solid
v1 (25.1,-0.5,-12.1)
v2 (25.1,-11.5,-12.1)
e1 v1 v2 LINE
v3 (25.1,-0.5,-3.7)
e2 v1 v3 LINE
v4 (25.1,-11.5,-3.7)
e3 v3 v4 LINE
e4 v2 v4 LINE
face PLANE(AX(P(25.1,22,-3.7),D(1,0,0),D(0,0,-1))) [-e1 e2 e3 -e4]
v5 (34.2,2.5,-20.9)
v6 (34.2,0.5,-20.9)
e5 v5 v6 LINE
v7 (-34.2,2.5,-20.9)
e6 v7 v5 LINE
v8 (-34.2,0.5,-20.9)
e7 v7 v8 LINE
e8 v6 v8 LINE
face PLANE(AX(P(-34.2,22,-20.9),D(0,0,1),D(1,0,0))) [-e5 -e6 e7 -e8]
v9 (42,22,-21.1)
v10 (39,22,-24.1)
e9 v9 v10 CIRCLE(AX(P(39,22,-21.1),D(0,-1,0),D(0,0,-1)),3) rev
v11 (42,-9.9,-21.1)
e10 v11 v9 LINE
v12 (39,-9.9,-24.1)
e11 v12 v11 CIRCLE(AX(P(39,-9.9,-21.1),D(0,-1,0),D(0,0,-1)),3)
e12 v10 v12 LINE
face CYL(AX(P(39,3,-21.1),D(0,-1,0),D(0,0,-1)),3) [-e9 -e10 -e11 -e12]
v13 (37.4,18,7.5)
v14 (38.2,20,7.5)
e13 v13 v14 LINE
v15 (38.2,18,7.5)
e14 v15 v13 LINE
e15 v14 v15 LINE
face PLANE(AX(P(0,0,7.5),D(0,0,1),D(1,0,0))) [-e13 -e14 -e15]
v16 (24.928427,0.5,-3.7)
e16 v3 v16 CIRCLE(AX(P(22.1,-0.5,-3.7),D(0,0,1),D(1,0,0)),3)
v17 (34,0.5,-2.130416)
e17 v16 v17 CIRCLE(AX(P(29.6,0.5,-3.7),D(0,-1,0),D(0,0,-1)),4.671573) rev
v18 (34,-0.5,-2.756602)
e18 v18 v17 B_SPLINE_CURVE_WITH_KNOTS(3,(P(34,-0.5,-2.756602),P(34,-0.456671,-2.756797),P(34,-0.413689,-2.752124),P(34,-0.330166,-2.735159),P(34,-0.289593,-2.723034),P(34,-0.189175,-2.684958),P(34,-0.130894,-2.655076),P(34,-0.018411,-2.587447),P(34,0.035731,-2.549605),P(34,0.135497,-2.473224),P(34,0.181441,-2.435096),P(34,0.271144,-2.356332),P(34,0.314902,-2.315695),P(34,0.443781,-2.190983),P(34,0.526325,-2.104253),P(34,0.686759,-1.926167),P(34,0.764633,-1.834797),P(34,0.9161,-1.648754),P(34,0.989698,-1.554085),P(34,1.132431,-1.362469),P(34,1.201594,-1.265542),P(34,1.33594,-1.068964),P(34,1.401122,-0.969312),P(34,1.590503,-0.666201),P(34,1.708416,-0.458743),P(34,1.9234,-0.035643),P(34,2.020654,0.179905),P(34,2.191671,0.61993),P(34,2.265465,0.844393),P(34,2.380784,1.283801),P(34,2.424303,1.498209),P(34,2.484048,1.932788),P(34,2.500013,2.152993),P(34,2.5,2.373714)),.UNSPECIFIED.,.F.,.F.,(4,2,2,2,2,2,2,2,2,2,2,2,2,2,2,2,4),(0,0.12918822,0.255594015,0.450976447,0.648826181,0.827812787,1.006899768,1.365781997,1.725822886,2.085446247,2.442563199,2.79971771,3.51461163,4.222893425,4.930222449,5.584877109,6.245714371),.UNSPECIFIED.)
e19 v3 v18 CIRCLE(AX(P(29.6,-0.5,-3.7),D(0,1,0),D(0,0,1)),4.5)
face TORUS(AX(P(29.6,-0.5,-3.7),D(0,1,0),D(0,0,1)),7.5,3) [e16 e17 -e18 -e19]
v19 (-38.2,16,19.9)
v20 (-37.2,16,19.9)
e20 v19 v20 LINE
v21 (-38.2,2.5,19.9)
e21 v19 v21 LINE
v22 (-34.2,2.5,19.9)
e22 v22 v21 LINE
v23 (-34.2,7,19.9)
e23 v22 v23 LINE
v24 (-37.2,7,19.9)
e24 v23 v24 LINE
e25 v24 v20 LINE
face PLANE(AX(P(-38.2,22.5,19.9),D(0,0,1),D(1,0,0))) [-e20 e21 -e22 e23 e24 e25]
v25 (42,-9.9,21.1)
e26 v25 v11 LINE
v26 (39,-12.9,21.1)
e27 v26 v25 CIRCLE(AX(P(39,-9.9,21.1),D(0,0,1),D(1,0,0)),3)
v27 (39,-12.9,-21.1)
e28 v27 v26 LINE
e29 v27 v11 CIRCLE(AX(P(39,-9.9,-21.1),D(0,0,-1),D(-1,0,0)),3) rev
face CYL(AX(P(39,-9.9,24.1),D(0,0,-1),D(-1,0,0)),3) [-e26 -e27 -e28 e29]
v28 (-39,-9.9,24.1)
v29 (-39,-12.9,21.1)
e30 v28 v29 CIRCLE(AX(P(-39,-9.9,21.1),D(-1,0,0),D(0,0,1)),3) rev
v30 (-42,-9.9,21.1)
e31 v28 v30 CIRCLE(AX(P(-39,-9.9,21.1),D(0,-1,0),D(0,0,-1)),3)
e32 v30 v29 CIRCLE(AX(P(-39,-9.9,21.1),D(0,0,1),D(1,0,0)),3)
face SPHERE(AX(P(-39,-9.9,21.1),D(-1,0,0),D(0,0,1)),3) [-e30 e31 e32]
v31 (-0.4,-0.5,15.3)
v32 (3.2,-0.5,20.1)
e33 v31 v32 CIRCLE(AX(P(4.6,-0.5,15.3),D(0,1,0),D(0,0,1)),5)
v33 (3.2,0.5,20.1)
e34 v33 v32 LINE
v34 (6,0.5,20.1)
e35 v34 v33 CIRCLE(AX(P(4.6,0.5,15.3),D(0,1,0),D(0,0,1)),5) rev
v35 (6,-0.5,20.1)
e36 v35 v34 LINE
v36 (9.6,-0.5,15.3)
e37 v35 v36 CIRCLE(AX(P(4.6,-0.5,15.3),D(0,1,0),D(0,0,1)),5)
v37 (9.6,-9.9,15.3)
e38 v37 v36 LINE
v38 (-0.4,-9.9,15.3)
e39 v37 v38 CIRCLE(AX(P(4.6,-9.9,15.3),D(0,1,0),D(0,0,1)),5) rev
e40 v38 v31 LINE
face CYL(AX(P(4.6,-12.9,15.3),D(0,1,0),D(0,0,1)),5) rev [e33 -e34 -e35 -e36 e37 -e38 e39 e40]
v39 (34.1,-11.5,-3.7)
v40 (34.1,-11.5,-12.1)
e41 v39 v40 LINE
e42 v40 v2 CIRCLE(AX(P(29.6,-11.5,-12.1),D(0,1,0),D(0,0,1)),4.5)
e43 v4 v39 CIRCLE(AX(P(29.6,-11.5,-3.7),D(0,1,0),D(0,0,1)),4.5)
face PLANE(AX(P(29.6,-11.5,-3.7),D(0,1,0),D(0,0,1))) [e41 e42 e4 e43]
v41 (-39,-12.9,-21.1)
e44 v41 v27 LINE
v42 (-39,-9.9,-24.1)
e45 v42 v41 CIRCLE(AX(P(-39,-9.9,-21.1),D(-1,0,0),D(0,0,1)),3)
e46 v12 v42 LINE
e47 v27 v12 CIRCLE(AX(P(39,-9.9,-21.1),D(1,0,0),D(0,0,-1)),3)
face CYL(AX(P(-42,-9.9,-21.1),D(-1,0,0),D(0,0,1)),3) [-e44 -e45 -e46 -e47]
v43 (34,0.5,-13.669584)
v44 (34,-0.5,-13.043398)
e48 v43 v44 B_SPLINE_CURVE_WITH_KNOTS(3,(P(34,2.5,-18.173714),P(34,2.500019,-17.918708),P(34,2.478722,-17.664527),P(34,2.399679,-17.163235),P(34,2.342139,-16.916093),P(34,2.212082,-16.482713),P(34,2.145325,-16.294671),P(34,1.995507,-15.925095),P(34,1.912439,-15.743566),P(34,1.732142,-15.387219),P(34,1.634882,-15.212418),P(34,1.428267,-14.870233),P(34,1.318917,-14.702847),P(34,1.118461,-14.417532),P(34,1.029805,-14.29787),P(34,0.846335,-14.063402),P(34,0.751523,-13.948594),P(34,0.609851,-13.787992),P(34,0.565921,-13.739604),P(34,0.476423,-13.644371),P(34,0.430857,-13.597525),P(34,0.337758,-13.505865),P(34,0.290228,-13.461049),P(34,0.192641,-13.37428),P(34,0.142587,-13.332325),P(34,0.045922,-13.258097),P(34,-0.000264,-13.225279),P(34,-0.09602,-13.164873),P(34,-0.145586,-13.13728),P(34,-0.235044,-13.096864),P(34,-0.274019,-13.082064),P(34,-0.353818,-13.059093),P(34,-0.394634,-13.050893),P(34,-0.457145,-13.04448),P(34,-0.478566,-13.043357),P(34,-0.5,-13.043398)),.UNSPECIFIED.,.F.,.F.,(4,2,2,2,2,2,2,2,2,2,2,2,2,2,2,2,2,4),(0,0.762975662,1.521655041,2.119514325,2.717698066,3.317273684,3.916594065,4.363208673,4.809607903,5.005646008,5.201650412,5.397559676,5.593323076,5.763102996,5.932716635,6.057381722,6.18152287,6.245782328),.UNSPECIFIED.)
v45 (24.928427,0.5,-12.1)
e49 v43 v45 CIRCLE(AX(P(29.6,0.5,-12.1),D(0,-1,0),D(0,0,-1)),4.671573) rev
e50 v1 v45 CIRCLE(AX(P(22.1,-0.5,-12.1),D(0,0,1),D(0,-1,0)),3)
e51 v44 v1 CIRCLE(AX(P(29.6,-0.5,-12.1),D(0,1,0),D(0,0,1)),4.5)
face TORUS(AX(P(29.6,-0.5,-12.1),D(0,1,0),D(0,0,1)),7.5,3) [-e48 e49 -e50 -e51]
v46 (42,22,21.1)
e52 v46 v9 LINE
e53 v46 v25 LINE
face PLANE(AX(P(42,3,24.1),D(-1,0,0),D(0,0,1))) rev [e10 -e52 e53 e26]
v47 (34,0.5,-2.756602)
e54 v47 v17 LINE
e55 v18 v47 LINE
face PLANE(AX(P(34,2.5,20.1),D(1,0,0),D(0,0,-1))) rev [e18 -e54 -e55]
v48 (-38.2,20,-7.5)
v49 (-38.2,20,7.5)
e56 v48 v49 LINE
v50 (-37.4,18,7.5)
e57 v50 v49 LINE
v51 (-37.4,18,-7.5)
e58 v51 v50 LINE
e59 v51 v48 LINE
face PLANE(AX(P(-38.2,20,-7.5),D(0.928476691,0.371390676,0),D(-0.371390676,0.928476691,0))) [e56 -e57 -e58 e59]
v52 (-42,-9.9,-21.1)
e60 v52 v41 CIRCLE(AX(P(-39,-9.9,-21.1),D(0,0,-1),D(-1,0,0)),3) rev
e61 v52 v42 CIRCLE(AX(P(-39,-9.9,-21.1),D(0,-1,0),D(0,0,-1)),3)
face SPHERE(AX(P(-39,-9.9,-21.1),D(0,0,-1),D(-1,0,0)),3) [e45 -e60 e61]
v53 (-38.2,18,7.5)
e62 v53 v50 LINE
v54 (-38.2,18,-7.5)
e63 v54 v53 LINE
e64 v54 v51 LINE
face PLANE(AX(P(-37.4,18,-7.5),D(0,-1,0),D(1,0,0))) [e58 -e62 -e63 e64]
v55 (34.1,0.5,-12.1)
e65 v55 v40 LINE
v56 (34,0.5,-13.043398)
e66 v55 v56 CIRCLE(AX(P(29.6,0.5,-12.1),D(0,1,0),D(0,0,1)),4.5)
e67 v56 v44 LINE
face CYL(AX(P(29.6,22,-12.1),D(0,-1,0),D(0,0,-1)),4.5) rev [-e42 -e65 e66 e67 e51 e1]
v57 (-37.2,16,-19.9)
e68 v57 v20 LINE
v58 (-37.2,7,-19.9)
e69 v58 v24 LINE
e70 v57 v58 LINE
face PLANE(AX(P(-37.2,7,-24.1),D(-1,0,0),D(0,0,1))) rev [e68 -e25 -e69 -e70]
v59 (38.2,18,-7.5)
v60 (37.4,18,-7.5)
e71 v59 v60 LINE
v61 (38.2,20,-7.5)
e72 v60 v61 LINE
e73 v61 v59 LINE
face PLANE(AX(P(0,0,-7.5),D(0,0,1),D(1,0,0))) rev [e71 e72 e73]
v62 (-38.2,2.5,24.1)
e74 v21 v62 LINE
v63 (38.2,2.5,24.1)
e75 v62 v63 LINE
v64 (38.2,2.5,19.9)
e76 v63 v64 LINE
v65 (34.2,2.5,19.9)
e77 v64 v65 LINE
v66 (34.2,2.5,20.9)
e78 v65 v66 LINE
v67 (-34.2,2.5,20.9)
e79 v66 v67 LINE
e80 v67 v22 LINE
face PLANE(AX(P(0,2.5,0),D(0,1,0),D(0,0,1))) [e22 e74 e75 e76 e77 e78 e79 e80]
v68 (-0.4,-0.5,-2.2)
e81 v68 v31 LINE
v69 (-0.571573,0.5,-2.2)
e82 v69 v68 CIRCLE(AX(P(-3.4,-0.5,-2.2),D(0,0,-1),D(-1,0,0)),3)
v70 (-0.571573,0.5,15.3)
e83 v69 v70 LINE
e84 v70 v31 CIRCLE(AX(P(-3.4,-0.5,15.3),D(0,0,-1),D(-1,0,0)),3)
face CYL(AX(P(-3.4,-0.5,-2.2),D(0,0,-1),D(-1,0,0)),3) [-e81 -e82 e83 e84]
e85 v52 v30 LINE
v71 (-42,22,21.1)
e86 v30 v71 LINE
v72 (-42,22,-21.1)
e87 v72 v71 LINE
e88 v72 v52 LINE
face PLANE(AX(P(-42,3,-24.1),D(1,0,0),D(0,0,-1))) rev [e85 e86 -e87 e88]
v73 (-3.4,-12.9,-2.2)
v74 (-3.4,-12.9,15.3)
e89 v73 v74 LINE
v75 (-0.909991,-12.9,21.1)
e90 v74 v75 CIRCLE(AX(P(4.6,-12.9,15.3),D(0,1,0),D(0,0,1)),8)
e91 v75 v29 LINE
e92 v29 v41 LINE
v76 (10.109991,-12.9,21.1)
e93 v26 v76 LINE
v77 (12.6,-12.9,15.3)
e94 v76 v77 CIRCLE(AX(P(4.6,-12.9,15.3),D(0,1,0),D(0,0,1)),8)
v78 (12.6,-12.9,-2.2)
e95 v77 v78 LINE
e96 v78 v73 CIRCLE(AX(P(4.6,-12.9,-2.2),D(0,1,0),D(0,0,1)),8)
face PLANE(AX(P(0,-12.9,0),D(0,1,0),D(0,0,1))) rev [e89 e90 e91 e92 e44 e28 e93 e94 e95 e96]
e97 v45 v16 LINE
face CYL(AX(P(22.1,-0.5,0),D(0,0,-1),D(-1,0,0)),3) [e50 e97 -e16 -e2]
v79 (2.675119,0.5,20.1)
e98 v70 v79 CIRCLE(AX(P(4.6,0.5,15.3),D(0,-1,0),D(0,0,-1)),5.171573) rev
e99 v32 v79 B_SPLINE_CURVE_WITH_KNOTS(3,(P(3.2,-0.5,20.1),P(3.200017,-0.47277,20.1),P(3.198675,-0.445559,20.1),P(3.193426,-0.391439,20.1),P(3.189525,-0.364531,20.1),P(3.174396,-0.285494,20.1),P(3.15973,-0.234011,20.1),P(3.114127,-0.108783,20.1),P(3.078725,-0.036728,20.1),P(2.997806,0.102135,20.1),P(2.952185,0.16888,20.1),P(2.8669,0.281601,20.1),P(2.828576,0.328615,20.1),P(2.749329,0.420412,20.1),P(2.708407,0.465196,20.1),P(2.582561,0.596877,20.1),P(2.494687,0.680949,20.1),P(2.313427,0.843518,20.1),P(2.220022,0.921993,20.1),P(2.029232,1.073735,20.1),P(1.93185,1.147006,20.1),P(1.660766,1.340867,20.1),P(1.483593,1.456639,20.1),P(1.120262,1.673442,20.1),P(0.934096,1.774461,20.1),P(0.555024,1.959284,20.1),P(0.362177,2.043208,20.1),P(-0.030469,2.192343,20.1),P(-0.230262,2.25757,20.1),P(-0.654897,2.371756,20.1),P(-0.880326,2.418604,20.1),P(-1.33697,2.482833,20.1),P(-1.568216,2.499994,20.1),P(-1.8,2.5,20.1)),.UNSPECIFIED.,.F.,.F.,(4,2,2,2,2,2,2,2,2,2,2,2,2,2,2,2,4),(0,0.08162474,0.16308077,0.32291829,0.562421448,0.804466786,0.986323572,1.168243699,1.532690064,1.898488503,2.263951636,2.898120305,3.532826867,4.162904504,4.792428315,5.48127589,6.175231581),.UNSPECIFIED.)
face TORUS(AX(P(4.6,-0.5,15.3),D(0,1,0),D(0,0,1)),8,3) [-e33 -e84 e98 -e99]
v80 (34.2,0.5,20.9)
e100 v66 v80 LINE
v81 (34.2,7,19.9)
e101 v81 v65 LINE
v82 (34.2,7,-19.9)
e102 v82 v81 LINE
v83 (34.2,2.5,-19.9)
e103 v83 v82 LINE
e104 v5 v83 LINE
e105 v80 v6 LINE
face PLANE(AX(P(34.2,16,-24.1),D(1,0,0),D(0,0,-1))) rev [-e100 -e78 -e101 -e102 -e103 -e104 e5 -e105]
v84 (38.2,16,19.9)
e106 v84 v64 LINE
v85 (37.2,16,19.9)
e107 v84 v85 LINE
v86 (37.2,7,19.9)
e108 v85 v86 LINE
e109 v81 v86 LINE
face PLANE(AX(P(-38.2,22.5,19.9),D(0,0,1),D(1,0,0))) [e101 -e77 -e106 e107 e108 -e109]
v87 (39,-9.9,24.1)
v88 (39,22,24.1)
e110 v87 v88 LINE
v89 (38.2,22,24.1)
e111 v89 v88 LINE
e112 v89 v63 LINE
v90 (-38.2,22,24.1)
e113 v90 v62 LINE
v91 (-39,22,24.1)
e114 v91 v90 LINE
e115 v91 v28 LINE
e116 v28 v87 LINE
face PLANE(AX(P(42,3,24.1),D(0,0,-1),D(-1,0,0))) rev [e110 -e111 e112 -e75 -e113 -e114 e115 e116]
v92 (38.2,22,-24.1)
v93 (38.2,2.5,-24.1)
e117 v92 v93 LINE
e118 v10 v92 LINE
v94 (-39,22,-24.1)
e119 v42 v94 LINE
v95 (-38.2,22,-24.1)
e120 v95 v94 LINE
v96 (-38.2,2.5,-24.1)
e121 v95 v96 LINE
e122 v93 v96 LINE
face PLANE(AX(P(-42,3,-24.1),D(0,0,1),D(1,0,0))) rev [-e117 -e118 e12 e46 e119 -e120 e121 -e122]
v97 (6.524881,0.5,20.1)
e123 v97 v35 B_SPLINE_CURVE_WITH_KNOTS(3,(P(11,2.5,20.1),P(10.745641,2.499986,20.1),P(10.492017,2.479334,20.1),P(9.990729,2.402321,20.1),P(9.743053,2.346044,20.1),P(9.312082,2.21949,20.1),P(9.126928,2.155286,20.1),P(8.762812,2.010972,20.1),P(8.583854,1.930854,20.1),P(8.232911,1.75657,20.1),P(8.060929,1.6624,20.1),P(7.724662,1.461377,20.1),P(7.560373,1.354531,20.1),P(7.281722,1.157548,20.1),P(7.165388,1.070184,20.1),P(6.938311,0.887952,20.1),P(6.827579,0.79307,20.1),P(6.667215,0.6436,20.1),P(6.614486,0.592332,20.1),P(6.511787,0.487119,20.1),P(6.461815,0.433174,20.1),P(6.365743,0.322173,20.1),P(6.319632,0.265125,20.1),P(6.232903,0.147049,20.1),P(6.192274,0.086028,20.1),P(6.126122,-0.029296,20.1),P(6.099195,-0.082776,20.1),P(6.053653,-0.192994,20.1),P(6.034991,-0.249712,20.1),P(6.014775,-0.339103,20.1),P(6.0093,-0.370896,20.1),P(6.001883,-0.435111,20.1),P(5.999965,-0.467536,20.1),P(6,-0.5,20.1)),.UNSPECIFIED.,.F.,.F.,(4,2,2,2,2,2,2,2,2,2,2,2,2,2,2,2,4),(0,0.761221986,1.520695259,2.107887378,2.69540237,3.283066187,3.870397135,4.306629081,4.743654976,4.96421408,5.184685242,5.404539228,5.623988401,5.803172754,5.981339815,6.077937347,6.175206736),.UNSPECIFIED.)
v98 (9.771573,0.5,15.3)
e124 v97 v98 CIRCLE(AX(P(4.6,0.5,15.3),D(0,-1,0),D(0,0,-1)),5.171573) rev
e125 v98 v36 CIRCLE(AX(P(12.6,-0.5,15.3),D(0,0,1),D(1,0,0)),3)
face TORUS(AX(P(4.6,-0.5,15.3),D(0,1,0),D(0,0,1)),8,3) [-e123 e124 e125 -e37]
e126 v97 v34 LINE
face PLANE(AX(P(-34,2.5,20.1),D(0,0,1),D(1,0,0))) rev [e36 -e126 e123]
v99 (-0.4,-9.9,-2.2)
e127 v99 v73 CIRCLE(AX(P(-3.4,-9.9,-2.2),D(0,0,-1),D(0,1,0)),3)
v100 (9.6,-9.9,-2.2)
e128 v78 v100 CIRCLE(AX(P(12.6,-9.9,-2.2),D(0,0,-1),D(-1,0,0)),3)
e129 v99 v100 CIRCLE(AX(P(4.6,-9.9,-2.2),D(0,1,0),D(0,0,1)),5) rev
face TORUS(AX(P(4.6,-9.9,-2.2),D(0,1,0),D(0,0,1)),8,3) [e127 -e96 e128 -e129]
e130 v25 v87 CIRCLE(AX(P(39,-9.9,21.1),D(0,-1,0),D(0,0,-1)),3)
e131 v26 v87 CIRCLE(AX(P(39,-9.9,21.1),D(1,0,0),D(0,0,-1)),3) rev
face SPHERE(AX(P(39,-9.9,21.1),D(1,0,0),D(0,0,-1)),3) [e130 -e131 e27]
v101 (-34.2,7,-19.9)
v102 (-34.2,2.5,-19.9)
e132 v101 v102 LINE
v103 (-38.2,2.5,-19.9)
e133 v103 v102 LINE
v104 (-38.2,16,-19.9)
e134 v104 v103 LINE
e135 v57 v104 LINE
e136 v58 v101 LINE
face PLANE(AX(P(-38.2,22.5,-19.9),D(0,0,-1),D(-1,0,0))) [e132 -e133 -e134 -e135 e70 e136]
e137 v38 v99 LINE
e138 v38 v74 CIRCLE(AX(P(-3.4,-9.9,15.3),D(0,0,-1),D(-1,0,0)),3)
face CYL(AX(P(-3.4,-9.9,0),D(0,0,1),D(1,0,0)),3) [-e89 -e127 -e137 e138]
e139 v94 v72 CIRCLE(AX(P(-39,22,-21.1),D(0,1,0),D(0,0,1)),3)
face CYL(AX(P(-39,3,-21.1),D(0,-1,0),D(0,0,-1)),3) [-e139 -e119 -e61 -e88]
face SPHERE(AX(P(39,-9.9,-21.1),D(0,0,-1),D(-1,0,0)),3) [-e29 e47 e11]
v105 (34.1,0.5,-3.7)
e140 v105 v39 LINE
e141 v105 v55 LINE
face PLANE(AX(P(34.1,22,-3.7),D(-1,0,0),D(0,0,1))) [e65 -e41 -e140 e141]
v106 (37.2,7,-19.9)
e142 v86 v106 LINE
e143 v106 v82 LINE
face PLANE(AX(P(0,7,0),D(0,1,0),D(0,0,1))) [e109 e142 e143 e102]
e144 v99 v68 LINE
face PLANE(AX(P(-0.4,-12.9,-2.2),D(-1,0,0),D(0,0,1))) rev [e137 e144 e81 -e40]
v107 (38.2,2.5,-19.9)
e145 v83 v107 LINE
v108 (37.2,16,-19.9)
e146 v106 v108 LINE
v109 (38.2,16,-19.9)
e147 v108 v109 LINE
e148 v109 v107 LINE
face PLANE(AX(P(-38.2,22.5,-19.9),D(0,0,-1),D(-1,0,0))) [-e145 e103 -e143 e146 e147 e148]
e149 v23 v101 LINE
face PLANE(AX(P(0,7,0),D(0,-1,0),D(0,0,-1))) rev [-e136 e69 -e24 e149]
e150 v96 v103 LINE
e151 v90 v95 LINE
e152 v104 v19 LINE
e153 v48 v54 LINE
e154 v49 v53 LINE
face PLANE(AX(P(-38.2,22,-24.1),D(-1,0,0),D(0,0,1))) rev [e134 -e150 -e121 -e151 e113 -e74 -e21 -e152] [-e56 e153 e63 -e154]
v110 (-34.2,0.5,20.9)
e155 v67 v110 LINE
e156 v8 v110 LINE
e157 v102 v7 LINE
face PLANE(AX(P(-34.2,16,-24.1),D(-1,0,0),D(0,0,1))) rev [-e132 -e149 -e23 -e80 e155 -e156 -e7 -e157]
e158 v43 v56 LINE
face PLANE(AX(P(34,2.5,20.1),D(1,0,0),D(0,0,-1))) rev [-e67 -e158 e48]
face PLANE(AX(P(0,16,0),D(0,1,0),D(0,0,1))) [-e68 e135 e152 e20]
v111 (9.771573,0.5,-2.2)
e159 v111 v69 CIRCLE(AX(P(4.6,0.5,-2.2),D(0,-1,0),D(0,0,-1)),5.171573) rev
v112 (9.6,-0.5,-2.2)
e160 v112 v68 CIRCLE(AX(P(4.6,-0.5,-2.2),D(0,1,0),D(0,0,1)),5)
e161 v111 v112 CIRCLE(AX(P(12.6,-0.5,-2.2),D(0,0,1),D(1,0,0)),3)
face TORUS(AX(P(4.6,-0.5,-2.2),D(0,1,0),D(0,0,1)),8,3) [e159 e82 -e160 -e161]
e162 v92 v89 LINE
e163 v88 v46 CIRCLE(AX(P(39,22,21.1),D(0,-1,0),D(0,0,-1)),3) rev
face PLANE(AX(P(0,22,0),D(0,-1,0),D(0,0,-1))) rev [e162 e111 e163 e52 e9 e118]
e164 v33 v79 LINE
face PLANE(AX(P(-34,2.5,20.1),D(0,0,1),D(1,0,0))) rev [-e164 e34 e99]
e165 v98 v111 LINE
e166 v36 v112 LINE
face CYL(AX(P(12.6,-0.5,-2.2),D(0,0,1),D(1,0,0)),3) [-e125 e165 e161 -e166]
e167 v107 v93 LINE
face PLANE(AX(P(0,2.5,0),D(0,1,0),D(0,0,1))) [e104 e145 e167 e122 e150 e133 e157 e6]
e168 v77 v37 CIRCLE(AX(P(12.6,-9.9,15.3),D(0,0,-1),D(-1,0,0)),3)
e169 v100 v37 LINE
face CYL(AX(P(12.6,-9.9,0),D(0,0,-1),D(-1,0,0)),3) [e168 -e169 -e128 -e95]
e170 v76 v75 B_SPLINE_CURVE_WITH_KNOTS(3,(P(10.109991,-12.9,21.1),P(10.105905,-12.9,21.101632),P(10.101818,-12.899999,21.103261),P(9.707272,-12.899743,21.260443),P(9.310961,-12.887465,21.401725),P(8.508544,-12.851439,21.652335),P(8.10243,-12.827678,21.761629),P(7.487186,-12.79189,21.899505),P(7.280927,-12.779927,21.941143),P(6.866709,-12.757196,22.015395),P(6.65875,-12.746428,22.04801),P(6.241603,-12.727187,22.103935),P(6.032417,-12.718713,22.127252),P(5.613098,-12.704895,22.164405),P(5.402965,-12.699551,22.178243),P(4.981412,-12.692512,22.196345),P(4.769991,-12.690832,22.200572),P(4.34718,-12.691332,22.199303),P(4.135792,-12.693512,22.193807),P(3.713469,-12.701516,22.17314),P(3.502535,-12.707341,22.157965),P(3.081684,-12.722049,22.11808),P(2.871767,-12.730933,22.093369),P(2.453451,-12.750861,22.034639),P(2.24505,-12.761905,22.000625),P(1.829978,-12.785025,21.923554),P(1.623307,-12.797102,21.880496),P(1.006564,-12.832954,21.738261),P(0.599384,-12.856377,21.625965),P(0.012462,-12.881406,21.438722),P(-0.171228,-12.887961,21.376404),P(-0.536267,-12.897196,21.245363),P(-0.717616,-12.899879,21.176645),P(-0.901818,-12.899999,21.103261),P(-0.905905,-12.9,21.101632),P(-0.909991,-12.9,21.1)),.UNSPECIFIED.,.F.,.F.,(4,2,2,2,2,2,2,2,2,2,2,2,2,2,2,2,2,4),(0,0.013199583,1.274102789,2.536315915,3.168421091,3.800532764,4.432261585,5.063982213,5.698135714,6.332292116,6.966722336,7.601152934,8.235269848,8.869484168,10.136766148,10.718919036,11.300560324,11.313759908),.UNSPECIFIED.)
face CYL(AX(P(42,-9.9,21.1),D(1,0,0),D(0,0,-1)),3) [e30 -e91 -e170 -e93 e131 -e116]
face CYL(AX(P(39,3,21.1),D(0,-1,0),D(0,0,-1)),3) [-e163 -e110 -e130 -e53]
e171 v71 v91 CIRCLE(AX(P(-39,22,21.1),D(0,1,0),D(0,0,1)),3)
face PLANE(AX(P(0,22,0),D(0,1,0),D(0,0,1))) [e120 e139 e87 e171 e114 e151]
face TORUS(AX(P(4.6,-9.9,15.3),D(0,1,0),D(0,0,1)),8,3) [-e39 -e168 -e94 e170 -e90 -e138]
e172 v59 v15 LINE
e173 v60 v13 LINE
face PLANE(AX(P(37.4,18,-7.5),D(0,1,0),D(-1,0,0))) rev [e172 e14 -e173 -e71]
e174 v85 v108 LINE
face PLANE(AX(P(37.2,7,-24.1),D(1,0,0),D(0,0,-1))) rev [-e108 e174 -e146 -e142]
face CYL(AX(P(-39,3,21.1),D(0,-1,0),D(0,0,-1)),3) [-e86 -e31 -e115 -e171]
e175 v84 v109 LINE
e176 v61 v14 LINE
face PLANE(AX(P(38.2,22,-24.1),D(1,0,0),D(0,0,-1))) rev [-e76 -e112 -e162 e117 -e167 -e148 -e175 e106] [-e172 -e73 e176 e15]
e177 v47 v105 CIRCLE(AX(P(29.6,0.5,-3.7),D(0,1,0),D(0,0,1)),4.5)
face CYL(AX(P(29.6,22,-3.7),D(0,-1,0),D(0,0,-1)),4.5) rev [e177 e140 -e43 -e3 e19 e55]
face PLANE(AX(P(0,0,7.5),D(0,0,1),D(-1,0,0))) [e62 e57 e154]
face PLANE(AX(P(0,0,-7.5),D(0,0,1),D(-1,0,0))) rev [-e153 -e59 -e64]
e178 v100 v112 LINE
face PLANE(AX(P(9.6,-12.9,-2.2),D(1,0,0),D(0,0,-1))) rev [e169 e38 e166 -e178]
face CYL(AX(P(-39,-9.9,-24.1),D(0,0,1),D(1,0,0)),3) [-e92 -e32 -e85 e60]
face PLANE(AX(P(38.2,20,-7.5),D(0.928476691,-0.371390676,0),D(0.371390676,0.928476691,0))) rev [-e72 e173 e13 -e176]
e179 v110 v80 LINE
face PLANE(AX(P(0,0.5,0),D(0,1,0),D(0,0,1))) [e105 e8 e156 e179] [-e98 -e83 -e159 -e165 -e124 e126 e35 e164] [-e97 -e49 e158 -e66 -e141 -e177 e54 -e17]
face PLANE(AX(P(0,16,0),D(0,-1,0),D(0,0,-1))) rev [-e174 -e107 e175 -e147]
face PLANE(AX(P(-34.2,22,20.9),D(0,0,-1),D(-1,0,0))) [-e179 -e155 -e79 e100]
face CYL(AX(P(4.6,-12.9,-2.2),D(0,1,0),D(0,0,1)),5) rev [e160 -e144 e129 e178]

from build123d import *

# Parameters (mm, degrees)
SKETCH2_W               = 84
SKETCH2_H               = 48.2
BOSS_EXTRUDE1_DEPTH     = 3
SKETCH3_W               = 3.8
SKETCH3_H               = 48.2
BOSS_EXTRUDE2_DEPTH     = 19
SKETCH4_W               = 4
SKETCH4_H               = 48.2
BOSS_EXTRUDE3_DEPTH     = 13
BOSS_EXTRUDE4_DEPTH     = 7.5
SKETCH6_W               = 3
SKETCH6_H               = 48.2
CUT_EXTRUDE1_DEPTH      = 9
SKETCH7_W               = 68
SKETCH7_H               = 40.2
CUT_EXTRUDE2_DEPTH      = 0.5
SKETCH9_W               = 84
SKETCH9_H               = 48.2
BOSS_EXTRUDE5_DEPTH     = 15.4
CUT_EXTRUDE3_DEPTH      = 53.202107237
CUT_EXTRUDE3_DEPTH_BACK = 14
CUT_EXTRUDE4_DEPTH      = 53.202107237
CUT_EXTRUDE4_DEPTH_BACK = 53.202107237
FILLET1_R               = 3
SKETCH12_W              = 76.4
SKETCH12_H              = 4.2
CUT_EXTRUDE5_DEPTH      = 20
CUT_EXTRUDE6_DEPTH      = 53.202107283
CUT_EXTRUDE6_DEPTH_BACK = 2
SKETCH13_W              = 68.4
SKETCH13_H              = 41.8


with BuildPart() as part:
    # Sketch2 → Boss-Extrude1 (new body)
    with BuildSketch(Plane(origin=(0, 0, 0), x_dir=(1, 0, 0), z_dir=(0, 1, 0))):
        Rectangle(SKETCH2_W, SKETCH2_H)
    extrude(amount=BOSS_EXTRUDE1_DEPTH)

    # Sketch3 → Boss-Extrude2 (add)
    with BuildSketch(Plane(origin=(0, 3, 0), x_dir=(1, 0, 0), z_dir=(0, 1, 0))):
        with Locations((-40.1, 0)):
            Rectangle(SKETCH3_W, SKETCH3_H)
        with Locations((40.1, 0)):
            Rectangle(SKETCH3_W, SKETCH3_H)
    extrude(amount=BOSS_EXTRUDE2_DEPTH)

    # Sketch4 → Boss-Extrude3 (add)
    with BuildSketch(Plane(origin=(0, 3, 0), x_dir=(1, 0, 0), z_dir=(0, 1, 0))):
        with Locations((-36.2, 0)):
            Rectangle(SKETCH4_W, SKETCH4_H)
        with Locations((36.2, 0)):
            Rectangle(SKETCH4_W, SKETCH4_H)
    extrude(amount=BOSS_EXTRUDE3_DEPTH)

    # Sketch5 → Boss-Extrude4 (add, symmetric)
    with BuildSketch(Plane(origin=(0, 0, 0), x_dir=(-1, 0, 0), z_dir=(0, 0, -1))):
        Polygon((-38.2, 20), (-37.4, 18), (-38.2, 18), align=None)
    boss_extrude4 = extrude(amount=BOSS_EXTRUDE4_DEPTH, both=True)

    # Sketch6 → Cut-Extrude1 (cut)
    with BuildSketch(Plane(origin=(0, 16, 0), x_dir=(1, 0, 0), z_dir=(0, 1, 0))):
        with Locations((35.7, 0)):
            Rectangle(SKETCH6_W, SKETCH6_H)
        with Locations((-35.7, 0)):
            Rectangle(SKETCH6_W, SKETCH6_H)
    extrude(amount=-CUT_EXTRUDE1_DEPTH, mode=Mode.SUBTRACT)

    # Mirror1: Boss-Extrude4 across plane
    add(boss_extrude4.mirror(Plane(origin=(0, 0, 0), x_dir=(0, 0, 1), z_dir=(1, 0, 0))))

    # Sketch7 → Cut-Extrude2 (cut)
    with BuildSketch(Plane(origin=(0, 3, 0), x_dir=(1, 0, 0), z_dir=(0, 1, 0))):
        Rectangle(SKETCH7_W, SKETCH7_H)
    extrude(amount=-CUT_EXTRUDE2_DEPTH, mode=Mode.SUBTRACT)

    # Sketch9 → Boss-Extrude5 (add)
    with BuildSketch(Plane(origin=(0, 2.5, 0), x_dir=(1, 0, 0), z_dir=(0, 1, 0))):
        Rectangle(SKETCH9_W, SKETCH9_H)
    extrude(amount=-BOSS_EXTRUDE5_DEPTH)

    # Sketch10 → Cut-Extrude3 (cut, two sides: drawn at the far end of the back side and taken through both)
    with BuildSketch(Plane(origin=(0, 2.5, 0), x_dir=(1, 0, 0), z_dir=(0, 1, 0)).offset(-CUT_EXTRUDE3_DEPTH_BACK)):
        with BuildLine():
            Line((25.1, 3.7), (25.1, 12.1))
            ThreePointArc((25.1, 12.1), (29.6, 16.6), (34.1, 12.1))
            Line((34.1, 12.1), (34.1, 3.7))
            ThreePointArc((34.1, 3.7), (29.6, -0.8), (25.1, 3.7))
        make_face()
    extrude(amount=CUT_EXTRUDE3_DEPTH + CUT_EXTRUDE3_DEPTH_BACK, mode=Mode.SUBTRACT)

    # Sketch11 → Cut-Extrude4 (cut, two sides: drawn at the far end of the back side and taken through both)
    with BuildSketch(Plane(origin=(0, 2.5, 0), x_dir=(1, 0, 0), z_dir=(0, 1, 0)).offset(-CUT_EXTRUDE4_DEPTH_BACK)):
        with BuildLine():
            Line((9.6, 2.2), (9.6, -15.3))
            ThreePointArc((9.6, -15.3), (4.6, -20.3), (-0.4, -15.3))
            Line((-0.4, -15.3), (-0.4, 2.2))
            ThreePointArc((-0.4, 2.2), (4.6, 7.2), (9.6, 2.2))
        make_face()
    extrude(amount=CUT_EXTRUDE4_DEPTH + CUT_EXTRUDE4_DEPTH_BACK, mode=Mode.SUBTRACT)

    # Fillet1
    # the kernel refuses this fillet: 3 mm, written as the material it takes off along each edge
    with BuildSketch(Plane(origin=(-39, -9.9, 21.1), x_dir=(-1, 0, 0), z_dir=(0, -1, 0))) as fillet1_piece_1_section:
        Polygon((0, 0), (FILLET1_R * 1.02, 0), (FILLET1_R * 1.02, -FILLET1_R * 1.02), (0, -FILLET1_R * 1.02), align=None)
    fillet1_piece_1 = extrude(amount=FILLET1_R * 1.02, mode=Mode.PRIVATE)
    fillet1_piece_1 = fillet1_piece_1 - Plane(origin=(-39, -9.9, 21.1), x_dir=(0.7071067811865475, 0, -0.7071067811865476), z_dir=(0, -1, 0)) * Sphere(FILLET1_R, mode=Mode.PRIVATE)
    add(fillet1_piece_1, mode=Mode.SUBTRACT)
    with BuildSketch(Plane(origin=(-39, -9.9, -21.1), x_dir=(0, -1, 0), z_dir=(0, 0, -1))) as fillet1_piece_2_section:
        Polygon((0, 0), (FILLET1_R * 1.02, 0), (FILLET1_R * 1.02, FILLET1_R * 1.02), (0, FILLET1_R * 1.02), align=None)
    fillet1_piece_2 = extrude(amount=FILLET1_R * 1.02, mode=Mode.PRIVATE)
    fillet1_piece_2 = fillet1_piece_2 - Plane(origin=(-39, -9.9, -21.1), x_dir=(0.7071067811865475, 0.7071067811865475, 0), z_dir=(0, 0, -1)) * Sphere(FILLET1_R, mode=Mode.PRIVATE)
    add(fillet1_piece_2, mode=Mode.SUBTRACT)
    with BuildSketch(Plane(origin=(39, -9.9, -21.1), x_dir=(0, -1, 0), z_dir=(0, 0, -1))) as fillet1_piece_3_section:
        Polygon((0, 0), (FILLET1_R * 1.02, 0), (FILLET1_R * 1.02, -FILLET1_R * 1.02), (0, -FILLET1_R * 1.02), align=None)
    fillet1_piece_3 = extrude(amount=FILLET1_R * 1.02, mode=Mode.PRIVATE)
    fillet1_piece_3 = fillet1_piece_3 - Plane(origin=(39, -9.9, -21.1), x_dir=(-0.7071067811865475, 0.7071067811865475, 0), z_dir=(0, 0, -1)) * Sphere(FILLET1_R, mode=Mode.PRIVATE)
    add(fillet1_piece_3, mode=Mode.SUBTRACT)
    with BuildSketch(Plane(origin=(39, -9.9, 21.1), x_dir=(0, -1, 0), z_dir=(1, 0, 0))) as fillet1_piece_4_section:
        Polygon((0, 0), (FILLET1_R * 1.02, 0), (FILLET1_R * 1.02, -FILLET1_R * 1.02), (0, -FILLET1_R * 1.02), align=None)
    fillet1_piece_4 = extrude(amount=FILLET1_R * 1.02, mode=Mode.PRIVATE)
    fillet1_piece_4 = fillet1_piece_4 - Plane(origin=(39, -9.9, 21.1), x_dir=(0, 0.7071067811865475, -0.7071067811865475), z_dir=(1, 0, 0)) * Sphere(FILLET1_R, mode=Mode.PRIVATE)
    add(fillet1_piece_4, mode=Mode.SUBTRACT)
    with BuildSketch(Plane(origin=(-42, -12.9, 21.1), x_dir=(1, 0, 0), z_dir=(0, 0, -1)), Plane(origin=(42, -12.9, -21.1), x_dir=(-1, 0, 0), z_dir=(0, 0, 1))) as fillet1_piece_5:
        with BuildLine():
            CenterArc((FILLET1_R, -FILLET1_R), FILLET1_R, 90, 90)
            Line((0, -FILLET1_R), (0, 0))
            Line((0, 0), (FILLET1_R, 0))
        make_face()
    extrude(amount=42.2, mode=Mode.SUBTRACT)
    with BuildSketch(Plane(origin=(-39, -12.9, -24.1), x_dir=(0, 1, 0), z_dir=(1, 0, 0))) as fillet1_piece_6:
        with BuildLine():
            CenterArc((FILLET1_R, FILLET1_R), FILLET1_R, 180, 90)
            Line((0, FILLET1_R), (0, 0))
            Line((0, 0), (FILLET1_R, 0))
        make_face()
    extrude(amount=78, mode=Mode.SUBTRACT)
    with BuildSketch(Plane(origin=(39, -12.9, 24.1), x_dir=(0, 0, -1), z_dir=(-1, 0, 0))) as fillet1_piece_7:
        with BuildLine():
            CenterArc((FILLET1_R, -FILLET1_R), FILLET1_R, 90, 90)
            Line((0, -FILLET1_R), (0, 0))
            Line((0, 0), (FILLET1_R, 0))
        make_face()
    extrude(amount=78, mode=Mode.SUBTRACT)
    with BuildSketch(Plane(origin=(25.1, 2.5, -3.7), x_dir=(-1, 0, 0), z_dir=(0, 0, -1))) as fillet1_piece_8:
        with BuildLine():
            CenterArc((FILLET1_R, -FILLET1_R), FILLET1_R, 90, 90)
            Line((0, -FILLET1_R), (0, 0))
            Line((0, 0), (FILLET1_R, 0))
        make_face()
    extrude(amount=8.4, mode=Mode.SUBTRACT)
    with BuildSketch(Plane(origin=(29.6, 2.5, -12.1), x_dir=(-1, 0, 0), z_dir=(0, 0, 1))) as fillet1_piece_9_section:
        with BuildLine():
            CenterArc((4.5 + FILLET1_R, FILLET1_R), FILLET1_R, 180, 90)
            Line((4.5 + FILLET1_R, 0), (4.5, 0))
            Line((4.5, 0), (4.5, FILLET1_R))
        make_face()
    fillet1_piece_9 = revolve(axis=Axis((29.6, 2.5, -12.1), (0, -1, 0)), revolution_arc=263.525069882, mode=Mode.PRIVATE)
    fillet1_piece_9 = split(fillet1_piece_9, bisect_by=Plane(origin=(34, 1.640934382, -17.429209867), z_dir=(-1, 0, 0)), keep=Keep.TOP, mode=Mode.PRIVATE)
    add(fillet1_piece_9, mode=Mode.SUBTRACT)
    with BuildSketch(Plane(origin=(29.6, 2.5, -3.7), x_dir=(0.11276846361504911, 0, -0.9936212928545268), z_dir=(-0.9936212928545268, 0, -0.11276846361504911))) as fillet1_piece_10_section:
        with BuildLine():
            CenterArc((4.5 + FILLET1_R, FILLET1_R), FILLET1_R, 180, 90)
            Line((4.5 + FILLET1_R, 0), (4.5, 0))
            Line((4.5, 0), (4.5, FILLET1_R))
        make_face()
    fillet1_piece_10 = revolve(axis=Axis((29.6, 2.5, -3.7), (0, -1, 0)), revolution_arc=263.525069882, mode=Mode.PRIVATE)
    fillet1_piece_10 = split(fillet1_piece_10, bisect_by=Plane(origin=(34, 1.640934386, 1.629209863), z_dir=(-1, 0, 0)), keep=Keep.TOP, mode=Mode.PRIVATE)
    add(fillet1_piece_10, mode=Mode.SUBTRACT)
    with BuildSketch(Plane(origin=(4.6, 2.5, -2.2), x_dir=(-1, 0, 0), z_dir=(0, 0, 1))) as fillet1_piece_11:
        with BuildLine():
            CenterArc((5 + FILLET1_R, FILLET1_R), FILLET1_R, 180, 90)
            Line((5 + FILLET1_R, 0), (5, 0))
            Line((5, 0), (5, FILLET1_R))
        make_face()
    revolve(axis=Axis((4.6, 2.5, -2.2), (0, -1, 0)), revolution_arc=180, mode=Mode.SUBTRACT)
    with BuildSketch(Plane(origin=(9.6, 2.5, -2.2), x_dir=(0, -1, 0), z_dir=(0, 0, 1)), Plane(origin=(-0.4, 2.5, 15.3), x_dir=(0, -1, 0), z_dir=(0, 0, -1)), Plane(origin=(9.6, -12.9, -2.2), x_dir=(1, 0, 0), z_dir=(0, 0, 1)), Plane(origin=(-0.4, -12.9, 15.3), x_dir=(-1, 0, 0), z_dir=(0, 0, -1))) as fillet1_piece_12:
        with BuildLine():
            CenterArc((FILLET1_R, FILLET1_R), FILLET1_R, 180, 90)
            Line((0, FILLET1_R), (0, 0))
            Line((0, 0), (FILLET1_R, 0))
        make_face()
    extrude(amount=17.5, mode=Mode.SUBTRACT)
    with BuildSketch(Plane(origin=(4.6, 2.5, 15.3), x_dir=(1, 0, 0), z_dir=(0, 0, -1))) as fillet1_piece_13_section:
        with BuildLine():
            CenterArc((5 + FILLET1_R, FILLET1_R), FILLET1_R, 180, 90)
            Line((5 + FILLET1_R, 0), (5, 0))
            Line((5, 0), (5, FILLET1_R))
        make_face()
    fillet1_piece_13 = revolve(axis=Axis((4.6, 2.5, 15.3), (0, -1, 0)), revolution_arc=159.706638681, mode=Mode.PRIVATE)
    fillet1_piece_13 = split(fillet1_piece_13, bisect_by=Plane(origin=(8.507236212, 1.653326519, 20.1), z_dir=(0, 0, -1)), keep=Keep.TOP, mode=Mode.PRIVATE)
    add(fillet1_piece_13, mode=Mode.SUBTRACT)
    with BuildSketch(Plane(origin=(4.6, 2.5, 15.3), x_dir=(0.9379291266520984, 0, 0.3468269790221515), z_dir=(0.3468269790221515, 0, -0.9379291266520984))) as fillet1_piece_14_section:
        with BuildLine():
            CenterArc((5 + FILLET1_R, FILLET1_R), FILLET1_R, 180, 90)
            Line((5 + FILLET1_R, 0), (5, 0))
            Line((5, 0), (5, FILLET1_R))
        make_face()
    fillet1_piece_14 = revolve(axis=Axis((4.6, 2.5, 15.3), (0, -1, 0)), revolution_arc=159.706638681, mode=Mode.PRIVATE)
    fillet1_piece_14 = split(fillet1_piece_14, bisect_by=Plane(origin=(8.773531285, 1.782701888, 20.1), z_dir=(0, 0, -1)), keep=Keep.TOP, mode=Mode.PRIVATE)
    add(fillet1_piece_14, mode=Mode.SUBTRACT)
    with BuildSketch(Plane(origin=(4.6, -12.9, -2.2), x_dir=(-1, 0, 0), z_dir=(0, 0, 1))) as fillet1_piece_15:
        with BuildLine():
            CenterArc((5 + FILLET1_R, -FILLET1_R), FILLET1_R, 90, 90)
            Line((5, -FILLET1_R), (5, 0))
            Line((5, 0), (5 + FILLET1_R, 0))
        make_face()
    revolve(axis=Axis((4.6, -12.9, -2.2), (0, -1, 0)), revolution_arc=180, mode=Mode.SUBTRACT)
    with BuildSketch(Plane(origin=(4.6, -12.9, 15.3), x_dir=(1, 0, 0), z_dir=(0, 0, -1))) as fillet1_piece_16:
        with BuildLine():
            CenterArc((5 + FILLET1_R, -FILLET1_R), FILLET1_R, 90, 90)
            Line((5, -FILLET1_R), (5, 0))
            Line((5, 0), (5 + FILLET1_R, 0))
        make_face()
    revolve(axis=Axis((4.6, -12.9, 15.3), (0, -1, 0)), revolution_arc=180, mode=Mode.SUBTRACT)
    with BuildSketch(Plane(origin=(-42, -9.9, -24.1), x_dir=(1, 0, 0), z_dir=(0, 1, 0)), Plane(origin=(42, 29.5, -24.1), x_dir=(-1, 0, 0), z_dir=(0, -1, 0)), Plane(origin=(42, 29.5, 24.1), x_dir=(0, 0, -1), z_dir=(0, -1, 0)), Plane(origin=(-42, -9.9, 24.1), x_dir=(0, 0, -1), z_dir=(0, 1, 0))) as fillet1_piece_17:
        with BuildLine():
            CenterArc((FILLET1_R, -FILLET1_R), FILLET1_R, 90, 90)
            Line((0, -FILLET1_R), (0, 0))
            Line((0, 0), (FILLET1_R, 0))
        make_face()
    extrude(amount=39.4, mode=Mode.SUBTRACT)

    # Sketch12 → Cut-Extrude5 (cut)
    with BuildSketch(Plane(origin=(0, 2.5, 0), x_dir=(1, 0, 0), z_dir=(0, 1, 0))):
        with Locations((0, 22)):
            Rectangle(SKETCH12_W, SKETCH12_H)
        with Locations((0, -22)):
            Rectangle(SKETCH12_W, SKETCH12_H)
    extrude(amount=CUT_EXTRUDE5_DEPTH, mode=Mode.SUBTRACT)

    # Sketch13 → Cut-Extrude6 (cut, two sides: drawn at the far end of the back side and taken through both)
    with BuildSketch(Plane(origin=(0, 2.5, 0), x_dir=(1, 0, 0), z_dir=(0, 1, 0)).offset(-CUT_EXTRUDE6_DEPTH_BACK)):
        Rectangle(SKETCH13_W, SKETCH13_H)
    extrude(amount=CUT_EXTRUDE6_DEPTH + CUT_EXTRUDE6_DEPTH_BACK, mode=Mode.SUBTRACT)


solid = part.part
